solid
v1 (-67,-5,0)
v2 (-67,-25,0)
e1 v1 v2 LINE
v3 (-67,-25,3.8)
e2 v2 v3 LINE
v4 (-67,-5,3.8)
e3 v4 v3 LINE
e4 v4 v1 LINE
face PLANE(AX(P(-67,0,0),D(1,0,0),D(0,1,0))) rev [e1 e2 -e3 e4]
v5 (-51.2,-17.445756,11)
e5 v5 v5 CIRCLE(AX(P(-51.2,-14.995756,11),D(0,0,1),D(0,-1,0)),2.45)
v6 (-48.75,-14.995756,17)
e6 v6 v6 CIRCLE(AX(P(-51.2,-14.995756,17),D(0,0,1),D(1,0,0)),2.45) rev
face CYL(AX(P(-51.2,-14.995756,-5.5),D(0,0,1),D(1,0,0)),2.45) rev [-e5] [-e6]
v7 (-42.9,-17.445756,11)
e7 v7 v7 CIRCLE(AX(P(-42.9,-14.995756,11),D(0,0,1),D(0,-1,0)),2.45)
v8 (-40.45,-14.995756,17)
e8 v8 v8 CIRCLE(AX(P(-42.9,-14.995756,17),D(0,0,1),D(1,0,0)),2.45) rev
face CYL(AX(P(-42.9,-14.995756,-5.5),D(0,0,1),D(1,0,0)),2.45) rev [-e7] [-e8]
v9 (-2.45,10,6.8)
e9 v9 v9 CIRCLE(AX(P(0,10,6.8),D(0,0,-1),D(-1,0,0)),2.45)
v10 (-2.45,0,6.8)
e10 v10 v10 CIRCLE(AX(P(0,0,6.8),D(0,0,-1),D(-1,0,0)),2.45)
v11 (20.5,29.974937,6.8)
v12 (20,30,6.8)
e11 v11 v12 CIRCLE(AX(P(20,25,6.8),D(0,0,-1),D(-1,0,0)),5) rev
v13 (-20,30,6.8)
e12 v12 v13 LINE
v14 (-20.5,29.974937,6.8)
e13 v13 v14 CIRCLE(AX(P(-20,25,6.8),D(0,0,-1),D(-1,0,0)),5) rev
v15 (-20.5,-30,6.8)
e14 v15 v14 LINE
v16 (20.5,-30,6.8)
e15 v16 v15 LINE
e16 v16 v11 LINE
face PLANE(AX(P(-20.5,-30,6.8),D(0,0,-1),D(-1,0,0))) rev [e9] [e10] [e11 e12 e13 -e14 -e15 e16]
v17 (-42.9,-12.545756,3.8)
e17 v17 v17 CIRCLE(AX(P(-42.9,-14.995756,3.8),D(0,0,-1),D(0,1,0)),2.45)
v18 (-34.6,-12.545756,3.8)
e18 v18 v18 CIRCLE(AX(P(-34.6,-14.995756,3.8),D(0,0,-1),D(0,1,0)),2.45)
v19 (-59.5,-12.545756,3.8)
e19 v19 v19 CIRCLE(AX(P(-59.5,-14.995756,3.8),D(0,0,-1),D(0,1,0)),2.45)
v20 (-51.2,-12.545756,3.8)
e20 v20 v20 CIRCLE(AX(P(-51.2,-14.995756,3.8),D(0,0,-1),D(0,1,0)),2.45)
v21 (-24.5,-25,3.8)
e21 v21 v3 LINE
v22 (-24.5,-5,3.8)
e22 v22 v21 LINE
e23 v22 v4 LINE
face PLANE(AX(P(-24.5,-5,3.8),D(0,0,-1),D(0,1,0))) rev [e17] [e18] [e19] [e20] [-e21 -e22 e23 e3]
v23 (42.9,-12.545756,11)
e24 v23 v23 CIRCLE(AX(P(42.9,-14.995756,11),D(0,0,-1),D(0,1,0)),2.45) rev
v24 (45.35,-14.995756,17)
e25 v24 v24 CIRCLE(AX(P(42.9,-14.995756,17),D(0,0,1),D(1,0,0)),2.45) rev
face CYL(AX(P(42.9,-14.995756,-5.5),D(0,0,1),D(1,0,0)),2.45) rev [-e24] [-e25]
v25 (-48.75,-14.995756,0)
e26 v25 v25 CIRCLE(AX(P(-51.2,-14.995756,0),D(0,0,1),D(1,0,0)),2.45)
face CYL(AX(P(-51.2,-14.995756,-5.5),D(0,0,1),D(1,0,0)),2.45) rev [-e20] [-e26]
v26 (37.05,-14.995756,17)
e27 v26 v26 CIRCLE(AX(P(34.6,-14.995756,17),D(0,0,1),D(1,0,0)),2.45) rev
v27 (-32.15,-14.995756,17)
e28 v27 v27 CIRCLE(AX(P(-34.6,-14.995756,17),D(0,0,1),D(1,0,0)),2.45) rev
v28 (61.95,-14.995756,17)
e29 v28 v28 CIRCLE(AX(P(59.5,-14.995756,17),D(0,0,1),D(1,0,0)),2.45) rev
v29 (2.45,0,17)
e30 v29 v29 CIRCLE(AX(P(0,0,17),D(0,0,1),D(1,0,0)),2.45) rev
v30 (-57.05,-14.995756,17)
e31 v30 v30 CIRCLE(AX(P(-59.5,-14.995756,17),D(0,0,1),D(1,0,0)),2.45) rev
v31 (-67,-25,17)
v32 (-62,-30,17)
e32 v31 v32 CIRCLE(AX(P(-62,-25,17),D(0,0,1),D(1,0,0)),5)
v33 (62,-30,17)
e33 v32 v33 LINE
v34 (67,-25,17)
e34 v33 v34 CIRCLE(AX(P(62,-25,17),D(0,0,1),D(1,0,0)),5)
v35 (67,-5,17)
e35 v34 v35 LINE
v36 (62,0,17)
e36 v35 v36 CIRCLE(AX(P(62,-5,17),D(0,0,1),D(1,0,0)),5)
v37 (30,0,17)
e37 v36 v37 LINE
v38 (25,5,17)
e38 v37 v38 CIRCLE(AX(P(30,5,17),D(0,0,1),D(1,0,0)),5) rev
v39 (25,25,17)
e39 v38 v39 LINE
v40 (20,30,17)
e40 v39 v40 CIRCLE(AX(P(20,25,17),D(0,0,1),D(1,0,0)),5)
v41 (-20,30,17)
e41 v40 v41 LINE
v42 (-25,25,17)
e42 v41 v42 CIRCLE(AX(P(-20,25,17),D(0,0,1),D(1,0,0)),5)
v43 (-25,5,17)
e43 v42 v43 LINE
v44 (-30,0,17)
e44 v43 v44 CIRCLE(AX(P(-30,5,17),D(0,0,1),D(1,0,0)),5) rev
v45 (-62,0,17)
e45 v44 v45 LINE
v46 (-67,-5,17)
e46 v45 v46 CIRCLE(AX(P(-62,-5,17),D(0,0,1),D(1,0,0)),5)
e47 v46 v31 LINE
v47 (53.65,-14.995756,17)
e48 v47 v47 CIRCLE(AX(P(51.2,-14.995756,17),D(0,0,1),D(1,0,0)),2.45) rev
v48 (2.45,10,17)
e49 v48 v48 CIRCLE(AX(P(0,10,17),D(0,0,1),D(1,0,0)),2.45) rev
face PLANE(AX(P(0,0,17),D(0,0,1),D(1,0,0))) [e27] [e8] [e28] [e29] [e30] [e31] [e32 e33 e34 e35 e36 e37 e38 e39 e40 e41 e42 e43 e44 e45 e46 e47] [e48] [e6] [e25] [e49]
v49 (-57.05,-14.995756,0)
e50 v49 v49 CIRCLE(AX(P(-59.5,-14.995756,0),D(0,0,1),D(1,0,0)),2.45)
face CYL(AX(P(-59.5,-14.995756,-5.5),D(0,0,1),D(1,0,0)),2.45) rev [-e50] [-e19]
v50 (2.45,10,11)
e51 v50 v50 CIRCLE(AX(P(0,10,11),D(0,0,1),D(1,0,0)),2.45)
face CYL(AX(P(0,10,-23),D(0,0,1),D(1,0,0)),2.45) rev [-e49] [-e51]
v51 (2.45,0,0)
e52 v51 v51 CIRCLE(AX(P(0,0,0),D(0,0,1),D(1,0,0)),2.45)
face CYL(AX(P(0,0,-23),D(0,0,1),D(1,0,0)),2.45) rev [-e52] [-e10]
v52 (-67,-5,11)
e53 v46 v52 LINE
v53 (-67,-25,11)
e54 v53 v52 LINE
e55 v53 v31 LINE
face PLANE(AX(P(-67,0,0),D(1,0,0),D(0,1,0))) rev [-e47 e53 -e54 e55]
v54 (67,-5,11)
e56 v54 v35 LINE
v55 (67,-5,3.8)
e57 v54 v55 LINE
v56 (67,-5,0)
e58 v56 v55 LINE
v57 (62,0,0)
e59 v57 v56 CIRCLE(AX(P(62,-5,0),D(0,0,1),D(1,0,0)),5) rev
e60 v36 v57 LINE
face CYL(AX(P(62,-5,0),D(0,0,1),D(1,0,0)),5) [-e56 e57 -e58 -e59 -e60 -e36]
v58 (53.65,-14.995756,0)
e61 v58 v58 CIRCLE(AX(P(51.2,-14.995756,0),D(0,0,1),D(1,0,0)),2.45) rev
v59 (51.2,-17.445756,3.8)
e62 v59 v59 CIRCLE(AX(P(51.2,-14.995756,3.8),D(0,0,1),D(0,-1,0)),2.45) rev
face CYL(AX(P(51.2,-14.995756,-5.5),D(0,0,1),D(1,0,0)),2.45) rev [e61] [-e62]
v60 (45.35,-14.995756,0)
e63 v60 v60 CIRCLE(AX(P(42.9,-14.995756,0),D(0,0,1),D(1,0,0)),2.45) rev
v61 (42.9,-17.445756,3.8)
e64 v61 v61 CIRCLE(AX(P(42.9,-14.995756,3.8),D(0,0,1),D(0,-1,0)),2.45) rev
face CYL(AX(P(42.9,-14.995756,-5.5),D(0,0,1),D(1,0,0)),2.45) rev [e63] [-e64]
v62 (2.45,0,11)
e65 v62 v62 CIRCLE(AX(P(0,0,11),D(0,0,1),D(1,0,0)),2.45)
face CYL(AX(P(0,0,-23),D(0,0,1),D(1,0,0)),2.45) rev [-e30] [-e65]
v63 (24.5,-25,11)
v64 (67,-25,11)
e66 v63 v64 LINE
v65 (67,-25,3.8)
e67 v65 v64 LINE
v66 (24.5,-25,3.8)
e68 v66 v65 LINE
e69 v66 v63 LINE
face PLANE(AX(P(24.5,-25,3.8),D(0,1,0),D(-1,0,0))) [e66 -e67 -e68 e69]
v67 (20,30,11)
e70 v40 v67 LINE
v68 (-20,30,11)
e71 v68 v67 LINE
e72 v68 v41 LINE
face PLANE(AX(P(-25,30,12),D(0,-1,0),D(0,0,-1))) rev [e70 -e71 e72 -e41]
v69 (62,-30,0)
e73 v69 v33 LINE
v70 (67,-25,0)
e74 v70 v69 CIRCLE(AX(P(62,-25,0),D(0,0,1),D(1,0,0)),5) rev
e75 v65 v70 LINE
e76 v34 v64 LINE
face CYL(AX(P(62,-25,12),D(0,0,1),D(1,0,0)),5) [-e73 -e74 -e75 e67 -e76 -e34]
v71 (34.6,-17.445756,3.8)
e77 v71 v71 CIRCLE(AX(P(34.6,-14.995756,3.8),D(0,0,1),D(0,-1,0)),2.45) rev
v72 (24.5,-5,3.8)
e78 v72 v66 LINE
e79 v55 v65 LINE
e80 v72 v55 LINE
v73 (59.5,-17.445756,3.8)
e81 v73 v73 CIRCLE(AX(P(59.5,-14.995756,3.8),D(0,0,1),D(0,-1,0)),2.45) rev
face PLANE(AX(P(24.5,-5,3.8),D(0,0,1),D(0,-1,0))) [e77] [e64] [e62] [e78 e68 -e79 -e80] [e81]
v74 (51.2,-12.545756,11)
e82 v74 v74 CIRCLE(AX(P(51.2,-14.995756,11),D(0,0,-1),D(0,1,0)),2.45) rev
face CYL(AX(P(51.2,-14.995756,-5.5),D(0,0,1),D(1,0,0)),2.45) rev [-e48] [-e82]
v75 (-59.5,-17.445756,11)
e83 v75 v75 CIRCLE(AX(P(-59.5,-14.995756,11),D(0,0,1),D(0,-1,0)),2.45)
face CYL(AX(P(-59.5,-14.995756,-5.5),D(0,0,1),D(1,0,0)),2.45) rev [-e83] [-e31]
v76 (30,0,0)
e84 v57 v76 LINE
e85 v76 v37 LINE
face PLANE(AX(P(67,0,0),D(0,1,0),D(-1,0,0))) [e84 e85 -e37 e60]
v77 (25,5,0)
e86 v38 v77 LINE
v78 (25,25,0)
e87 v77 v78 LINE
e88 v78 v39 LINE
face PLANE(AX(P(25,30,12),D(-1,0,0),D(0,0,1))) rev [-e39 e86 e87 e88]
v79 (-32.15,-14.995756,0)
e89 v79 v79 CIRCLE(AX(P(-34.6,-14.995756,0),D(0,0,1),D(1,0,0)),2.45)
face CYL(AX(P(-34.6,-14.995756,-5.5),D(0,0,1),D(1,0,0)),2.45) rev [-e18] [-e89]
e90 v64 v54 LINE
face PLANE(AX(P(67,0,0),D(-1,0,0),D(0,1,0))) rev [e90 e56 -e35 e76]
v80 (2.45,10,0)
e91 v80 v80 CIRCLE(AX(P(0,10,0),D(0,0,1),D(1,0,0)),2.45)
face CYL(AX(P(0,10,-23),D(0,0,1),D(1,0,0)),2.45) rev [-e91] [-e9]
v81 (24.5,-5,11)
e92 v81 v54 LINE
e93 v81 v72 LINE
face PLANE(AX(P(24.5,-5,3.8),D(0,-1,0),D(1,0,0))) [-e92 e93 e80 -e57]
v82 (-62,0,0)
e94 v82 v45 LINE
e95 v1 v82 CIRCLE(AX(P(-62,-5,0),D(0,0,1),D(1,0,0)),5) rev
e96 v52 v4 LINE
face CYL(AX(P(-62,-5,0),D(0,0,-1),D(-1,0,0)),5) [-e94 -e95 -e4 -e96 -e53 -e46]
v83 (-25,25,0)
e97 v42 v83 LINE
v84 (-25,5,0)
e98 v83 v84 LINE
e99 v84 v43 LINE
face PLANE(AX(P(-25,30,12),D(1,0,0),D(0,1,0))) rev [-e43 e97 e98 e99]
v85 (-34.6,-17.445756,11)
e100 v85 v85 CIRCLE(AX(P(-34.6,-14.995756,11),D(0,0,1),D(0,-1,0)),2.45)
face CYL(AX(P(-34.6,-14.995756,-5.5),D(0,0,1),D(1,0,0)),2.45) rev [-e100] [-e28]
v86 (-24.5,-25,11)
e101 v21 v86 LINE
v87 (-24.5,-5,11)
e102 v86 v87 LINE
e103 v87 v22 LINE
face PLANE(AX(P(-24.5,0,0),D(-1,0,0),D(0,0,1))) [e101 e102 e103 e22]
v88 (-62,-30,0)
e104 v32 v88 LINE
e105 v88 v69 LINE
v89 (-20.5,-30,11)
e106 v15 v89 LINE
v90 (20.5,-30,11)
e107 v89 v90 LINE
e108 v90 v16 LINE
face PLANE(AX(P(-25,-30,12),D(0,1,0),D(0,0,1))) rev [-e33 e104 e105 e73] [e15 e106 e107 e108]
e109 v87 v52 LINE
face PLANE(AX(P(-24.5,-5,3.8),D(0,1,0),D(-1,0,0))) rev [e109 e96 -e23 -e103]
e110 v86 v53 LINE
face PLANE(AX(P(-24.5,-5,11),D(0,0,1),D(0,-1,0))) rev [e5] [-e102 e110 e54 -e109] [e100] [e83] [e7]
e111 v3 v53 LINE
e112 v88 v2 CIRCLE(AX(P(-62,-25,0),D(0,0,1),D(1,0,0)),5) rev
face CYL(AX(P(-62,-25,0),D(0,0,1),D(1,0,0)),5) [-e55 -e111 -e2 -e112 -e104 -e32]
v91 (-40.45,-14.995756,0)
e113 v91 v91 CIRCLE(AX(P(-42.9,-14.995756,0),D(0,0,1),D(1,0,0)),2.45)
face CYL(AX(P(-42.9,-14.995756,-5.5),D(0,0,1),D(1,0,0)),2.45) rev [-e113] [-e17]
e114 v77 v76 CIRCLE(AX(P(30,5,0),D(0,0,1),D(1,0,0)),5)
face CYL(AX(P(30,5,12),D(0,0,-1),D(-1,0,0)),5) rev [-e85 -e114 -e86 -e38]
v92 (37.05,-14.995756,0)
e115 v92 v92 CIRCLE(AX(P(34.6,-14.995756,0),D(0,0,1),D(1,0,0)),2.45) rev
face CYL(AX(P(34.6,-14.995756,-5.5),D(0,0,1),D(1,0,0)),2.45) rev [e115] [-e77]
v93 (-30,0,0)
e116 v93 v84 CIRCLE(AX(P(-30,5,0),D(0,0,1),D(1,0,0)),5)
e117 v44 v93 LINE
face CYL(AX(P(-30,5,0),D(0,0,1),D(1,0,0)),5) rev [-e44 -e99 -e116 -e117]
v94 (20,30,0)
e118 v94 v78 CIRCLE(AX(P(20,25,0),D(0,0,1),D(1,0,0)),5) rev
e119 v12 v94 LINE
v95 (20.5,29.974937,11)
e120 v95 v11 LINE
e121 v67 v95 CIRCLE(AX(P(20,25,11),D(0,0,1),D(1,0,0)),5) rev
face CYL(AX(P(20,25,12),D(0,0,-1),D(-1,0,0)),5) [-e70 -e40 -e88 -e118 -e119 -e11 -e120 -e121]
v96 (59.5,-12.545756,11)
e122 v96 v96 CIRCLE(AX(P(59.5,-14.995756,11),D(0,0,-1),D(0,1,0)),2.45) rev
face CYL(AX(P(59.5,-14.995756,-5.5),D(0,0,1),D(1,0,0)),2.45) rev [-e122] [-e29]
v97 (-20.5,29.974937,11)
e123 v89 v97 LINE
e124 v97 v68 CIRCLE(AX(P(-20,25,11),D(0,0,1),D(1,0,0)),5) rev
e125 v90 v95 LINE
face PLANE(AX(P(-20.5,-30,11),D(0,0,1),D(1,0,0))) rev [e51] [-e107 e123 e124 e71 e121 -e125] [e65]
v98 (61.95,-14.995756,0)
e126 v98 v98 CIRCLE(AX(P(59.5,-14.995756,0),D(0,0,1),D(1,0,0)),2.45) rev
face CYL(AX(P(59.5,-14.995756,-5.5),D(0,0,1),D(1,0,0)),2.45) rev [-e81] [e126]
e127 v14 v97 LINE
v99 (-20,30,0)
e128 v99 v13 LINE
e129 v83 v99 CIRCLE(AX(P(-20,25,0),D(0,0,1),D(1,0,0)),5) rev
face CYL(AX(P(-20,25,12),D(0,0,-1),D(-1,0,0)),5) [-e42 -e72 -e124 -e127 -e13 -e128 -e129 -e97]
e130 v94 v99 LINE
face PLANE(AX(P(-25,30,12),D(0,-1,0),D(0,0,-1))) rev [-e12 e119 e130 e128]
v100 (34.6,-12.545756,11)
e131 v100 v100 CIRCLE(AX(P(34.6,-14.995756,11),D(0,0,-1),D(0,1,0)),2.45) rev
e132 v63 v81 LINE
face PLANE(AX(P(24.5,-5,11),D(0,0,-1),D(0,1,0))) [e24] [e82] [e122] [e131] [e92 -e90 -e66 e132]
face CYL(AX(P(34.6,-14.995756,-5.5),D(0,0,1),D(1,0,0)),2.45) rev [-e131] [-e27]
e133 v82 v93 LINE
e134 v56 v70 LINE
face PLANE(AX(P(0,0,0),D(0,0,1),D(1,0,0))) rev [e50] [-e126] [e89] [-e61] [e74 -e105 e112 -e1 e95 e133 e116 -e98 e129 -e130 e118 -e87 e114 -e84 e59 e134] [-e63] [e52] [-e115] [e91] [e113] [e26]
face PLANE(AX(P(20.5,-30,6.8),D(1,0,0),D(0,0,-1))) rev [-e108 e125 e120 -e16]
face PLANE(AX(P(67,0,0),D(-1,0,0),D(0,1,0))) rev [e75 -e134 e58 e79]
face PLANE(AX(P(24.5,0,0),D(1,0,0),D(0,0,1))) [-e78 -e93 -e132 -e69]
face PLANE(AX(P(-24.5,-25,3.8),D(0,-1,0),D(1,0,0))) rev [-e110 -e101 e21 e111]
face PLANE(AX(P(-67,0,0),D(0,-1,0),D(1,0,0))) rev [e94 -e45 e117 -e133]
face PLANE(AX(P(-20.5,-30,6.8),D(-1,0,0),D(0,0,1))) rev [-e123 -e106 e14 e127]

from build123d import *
from build123d.topology import SkipClean

# Parameters (mm, degrees)
SKETCH1_W           = 50
SKETCH1_H           = 60
BOSS_EXTRUDE1_DEPTH = 12
SKETCH2_W           = 41
SKETCH2_H           = 4.2
CUT_EXTRUDE1_DEPTH  = 67.098411479
SKETCH3_W           = 12
SKETCH3_H           = 30
BOSS_EXTRUDE2_DEPTH = 42
SKETCH4_W           = 7.2
SKETCH4_H           = 20
CUT_EXTRUDE2_DEPTH  = 42.5
SKETCH5_R           = 2.45
CUT_EXTRUDE3_DEPTH  = 17.5
FILLET1_R           = 5
SKETCH6_R           = 2.45
CUT_EXTRUDE4_DEPTH  = 35
BOSS_EXTRUDE3_START = 5
SKETCH7_R           = 2.45
BOSS_EXTRUDE3_DEPTH = 5


with BuildPart() as part:
    # Sketch1 → Boss-Extrude1 (new body)
    with BuildSketch(Plane.XY):
        Rectangle(SKETCH1_W, SKETCH1_H)
    extrude(amount=BOSS_EXTRUDE1_DEPTH)

    # Sketch2 → Cut-Extrude1 (cut, through all)
    with BuildSketch(Plane(origin=(0, 30, 0), x_dir=(1, 0, 0), z_dir=(0, 1, 0))):
        with Locations((0, -8.9)):
            Rectangle(SKETCH2_W, SKETCH2_H)
    extrude(amount=-CUT_EXTRUDE1_DEPTH, mode=Mode.SUBTRACT)

    # Sketch3 → Boss-Extrude2 (add)
    with BuildSketch(Plane.ZY.offset(25)):
        with Locations((6, -15)):
            Rectangle(SKETCH3_W, SKETCH3_H)
    boss_extrude2 = extrude(amount=BOSS_EXTRUDE2_DEPTH)

    # Sketch4 → Cut-Extrude2 (cut)
    with BuildSketch(Plane.ZY.offset(67)):
        with Locations((7.4, -15)):
            Rectangle(SKETCH4_W, SKETCH4_H)
    cut_extrude2 = extrude(amount=-CUT_EXTRUDE2_DEPTH, mode=Mode.SUBTRACT)

    # Sketch5 → Cut-Extrude3 (cut, symmetric)
    with BuildSketch(Plane.XY.offset(12)):
        with Locations((-59.5, -14.995756269)):
            Circle(SKETCH5_R)
        with Locations((-51.2, -14.995756269)):
            Circle(SKETCH5_R)
        with Locations((-42.9, -14.995756269)):
            Circle(SKETCH5_R)
        with Locations((-34.6, -14.995756269)):
            Circle(SKETCH5_R)
    cut_extrude3 = extrude(amount=CUT_EXTRUDE3_DEPTH, both=True, mode=Mode.SUBTRACT)

    # Mirror1: Boss-Extrude2, Cut-Extrude2, Cut-Extrude3 across plane
    add(boss_extrude2.mirror(Plane(origin=(0, 0, 0), x_dir=(0, 0, 1), z_dir=(1, 0, 0))))
    add(cut_extrude2.mirror(Plane(origin=(0, 0, 0), x_dir=(0, 0, 1), z_dir=(1, 0, 0))), mode=Mode.SUBTRACT)
    add(cut_extrude3.mirror(Plane(origin=(0, 0, 0), x_dir=(0, 0, 1), z_dir=(1, 0, 0))), mode=Mode.SUBTRACT)

    # Fillet1
    # the kernel refuses this fillet: 5 mm, written as the material it adds along each edge
    with BuildSketch(Plane(origin=(25, 0, 12), x_dir=(0, 1, 0), z_dir=(0, 0, -1))) as fillet1_piece_1:
        with BuildLine():
            CenterArc((FILLET1_R, FILLET1_R), FILLET1_R, 180, 90)
            Line((0, FILLET1_R), (0, 0))
            Line((0, 0), (FILLET1_R, 0))
        make_face()
    extrude(amount=12)
    with BuildSketch(Plane(origin=(-25, 0, 12), x_dir=(0, 1, 0), z_dir=(0, 0, -1))) as fillet1_piece_2:
        with BuildLine():
            CenterArc((FILLET1_R, -FILLET1_R), FILLET1_R, 90, 90)
            Line((0, -FILLET1_R), (0, 0))
            Line((0, 0), (FILLET1_R, 0))
        make_face()
    extrude(amount=12)
    # the kernel refuses this fillet: 5 mm, written as the material it takes off along each edge
    with BuildSketch(Plane(origin=(67, 0, 24.5), x_dir=(-1, 0, 0), z_dir=(0, 0, -1)), Plane(origin=(-67, -30, -12.5), x_dir=(0, 1, 0), z_dir=(0, 0, 1)), Plane(origin=(-25, 30, -12.5), x_dir=(1, 0, 0), z_dir=(0, 0, 1))) as fillet1_2_piece_1:
        with BuildLine():
            CenterArc((FILLET1_R, -FILLET1_R), FILLET1_R, 90, 90)
            Line((0, -FILLET1_R), (0, 0))
            Line((0, 0), (FILLET1_R, 0))
        make_face()
    extrude(amount=37, mode=Mode.SUBTRACT)
    with BuildSketch(Plane(origin=(67, -30, -12.5), x_dir=(0, 1, 0), z_dir=(0, 0, 1)), Plane(origin=(-67, 0, 24.5), x_dir=(1, 0, 0), z_dir=(0, 0, -1)), Plane(origin=(25, 30, -12.5), x_dir=(-1, 0, 0), z_dir=(0, 0, 1))) as fillet1_2_piece_2:
        with BuildLine():
            CenterArc((FILLET1_R, FILLET1_R), FILLET1_R, 180, 90)
            Line((0, FILLET1_R), (0, 0))
            Line((0, 0), (FILLET1_R, 0))
        make_face()
    extrude(amount=37, mode=Mode.SUBTRACT)

    # Sketch6 → Cut-Extrude4 (cut)
    with BuildSketch(Plane.XY.offset(12)):
        Circle(SKETCH6_R)
        with Locations((0, 10)):
            Circle(SKETCH6_R)
    extrude(amount=-CUT_EXTRUDE4_DEPTH, mode=Mode.SUBTRACT)

    # Sketch7 → Boss-Extrude3 (add)
    with SkipClean():  # the faces are left unmerged after this step: merging them gives an invalid solid
        with BuildSketch(Plane.XY.offset(12).offset(BOSS_EXTRUDE3_START)):
            with BuildLine():
                ThreePointArc((-67, -25), (-65.535533906, -28.535533906), (-62, -30))
                Line((-62, -30), (62, -30))
                ThreePointArc((62, -30), (65.535533906, -28.535533906), (67, -25))
                Line((67, -25), (67, -5))
                ThreePointArc((67, -5), (65.535533906, -1.464466094), (62, 0))
                Line((62, 0), (30, 0))
                ThreePointArc((30, 0), (26.464466094, 1.464466094), (25, 5))
                Line((25, 5), (25, 25))
                ThreePointArc((25, 25), (23.535533906, 28.535533906), (20, 30))
                Line((20, 30), (-20, 30))
                ThreePointArc((-20, 30), (-23.535533906, 28.535533906), (-25, 25))
                Line((-25, 25), (-25, 5))
                ThreePointArc((-25, 5), (-26.464466094, 1.464466094), (-30, 0))
                Line((-30, 0), (-62, 0))
                ThreePointArc((-62, 0), (-65.535533906, -1.464466094), (-67, -5))
                Line((-67, -5), (-67, -25))
            make_face()
            with Locations((-59.5, -14.995756269)):
                Circle(SKETCH7_R, mode=Mode.SUBTRACT)
            with Locations((-51.2, -14.995756269)):
                Circle(SKETCH7_R, mode=Mode.SUBTRACT)
            with Locations((-42.9, -14.995756269)):
                Circle(SKETCH7_R, mode=Mode.SUBTRACT)
            with Locations((-34.6, -14.995756269)):
                Circle(SKETCH7_R, mode=Mode.SUBTRACT)
            with Locations((59.5, -14.995756269)):
                Circle(SKETCH7_R, mode=Mode.SUBTRACT)
            with Locations((51.2, -14.995756269)):
                Circle(SKETCH7_R, mode=Mode.SUBTRACT)
            with Locations((42.9, -14.995756269)):
                Circle(SKETCH7_R, mode=Mode.SUBTRACT)
            with Locations((34.6, -14.995756269)):
                Circle(SKETCH7_R, mode=Mode.SUBTRACT)
            with Locations((0, 10)):
                Circle(SKETCH7_R, mode=Mode.SUBTRACT)
            Circle(SKETCH7_R, mode=Mode.SUBTRACT)
        extrude(amount=-BOSS_EXTRUDE3_DEPTH)


solid = part.part
